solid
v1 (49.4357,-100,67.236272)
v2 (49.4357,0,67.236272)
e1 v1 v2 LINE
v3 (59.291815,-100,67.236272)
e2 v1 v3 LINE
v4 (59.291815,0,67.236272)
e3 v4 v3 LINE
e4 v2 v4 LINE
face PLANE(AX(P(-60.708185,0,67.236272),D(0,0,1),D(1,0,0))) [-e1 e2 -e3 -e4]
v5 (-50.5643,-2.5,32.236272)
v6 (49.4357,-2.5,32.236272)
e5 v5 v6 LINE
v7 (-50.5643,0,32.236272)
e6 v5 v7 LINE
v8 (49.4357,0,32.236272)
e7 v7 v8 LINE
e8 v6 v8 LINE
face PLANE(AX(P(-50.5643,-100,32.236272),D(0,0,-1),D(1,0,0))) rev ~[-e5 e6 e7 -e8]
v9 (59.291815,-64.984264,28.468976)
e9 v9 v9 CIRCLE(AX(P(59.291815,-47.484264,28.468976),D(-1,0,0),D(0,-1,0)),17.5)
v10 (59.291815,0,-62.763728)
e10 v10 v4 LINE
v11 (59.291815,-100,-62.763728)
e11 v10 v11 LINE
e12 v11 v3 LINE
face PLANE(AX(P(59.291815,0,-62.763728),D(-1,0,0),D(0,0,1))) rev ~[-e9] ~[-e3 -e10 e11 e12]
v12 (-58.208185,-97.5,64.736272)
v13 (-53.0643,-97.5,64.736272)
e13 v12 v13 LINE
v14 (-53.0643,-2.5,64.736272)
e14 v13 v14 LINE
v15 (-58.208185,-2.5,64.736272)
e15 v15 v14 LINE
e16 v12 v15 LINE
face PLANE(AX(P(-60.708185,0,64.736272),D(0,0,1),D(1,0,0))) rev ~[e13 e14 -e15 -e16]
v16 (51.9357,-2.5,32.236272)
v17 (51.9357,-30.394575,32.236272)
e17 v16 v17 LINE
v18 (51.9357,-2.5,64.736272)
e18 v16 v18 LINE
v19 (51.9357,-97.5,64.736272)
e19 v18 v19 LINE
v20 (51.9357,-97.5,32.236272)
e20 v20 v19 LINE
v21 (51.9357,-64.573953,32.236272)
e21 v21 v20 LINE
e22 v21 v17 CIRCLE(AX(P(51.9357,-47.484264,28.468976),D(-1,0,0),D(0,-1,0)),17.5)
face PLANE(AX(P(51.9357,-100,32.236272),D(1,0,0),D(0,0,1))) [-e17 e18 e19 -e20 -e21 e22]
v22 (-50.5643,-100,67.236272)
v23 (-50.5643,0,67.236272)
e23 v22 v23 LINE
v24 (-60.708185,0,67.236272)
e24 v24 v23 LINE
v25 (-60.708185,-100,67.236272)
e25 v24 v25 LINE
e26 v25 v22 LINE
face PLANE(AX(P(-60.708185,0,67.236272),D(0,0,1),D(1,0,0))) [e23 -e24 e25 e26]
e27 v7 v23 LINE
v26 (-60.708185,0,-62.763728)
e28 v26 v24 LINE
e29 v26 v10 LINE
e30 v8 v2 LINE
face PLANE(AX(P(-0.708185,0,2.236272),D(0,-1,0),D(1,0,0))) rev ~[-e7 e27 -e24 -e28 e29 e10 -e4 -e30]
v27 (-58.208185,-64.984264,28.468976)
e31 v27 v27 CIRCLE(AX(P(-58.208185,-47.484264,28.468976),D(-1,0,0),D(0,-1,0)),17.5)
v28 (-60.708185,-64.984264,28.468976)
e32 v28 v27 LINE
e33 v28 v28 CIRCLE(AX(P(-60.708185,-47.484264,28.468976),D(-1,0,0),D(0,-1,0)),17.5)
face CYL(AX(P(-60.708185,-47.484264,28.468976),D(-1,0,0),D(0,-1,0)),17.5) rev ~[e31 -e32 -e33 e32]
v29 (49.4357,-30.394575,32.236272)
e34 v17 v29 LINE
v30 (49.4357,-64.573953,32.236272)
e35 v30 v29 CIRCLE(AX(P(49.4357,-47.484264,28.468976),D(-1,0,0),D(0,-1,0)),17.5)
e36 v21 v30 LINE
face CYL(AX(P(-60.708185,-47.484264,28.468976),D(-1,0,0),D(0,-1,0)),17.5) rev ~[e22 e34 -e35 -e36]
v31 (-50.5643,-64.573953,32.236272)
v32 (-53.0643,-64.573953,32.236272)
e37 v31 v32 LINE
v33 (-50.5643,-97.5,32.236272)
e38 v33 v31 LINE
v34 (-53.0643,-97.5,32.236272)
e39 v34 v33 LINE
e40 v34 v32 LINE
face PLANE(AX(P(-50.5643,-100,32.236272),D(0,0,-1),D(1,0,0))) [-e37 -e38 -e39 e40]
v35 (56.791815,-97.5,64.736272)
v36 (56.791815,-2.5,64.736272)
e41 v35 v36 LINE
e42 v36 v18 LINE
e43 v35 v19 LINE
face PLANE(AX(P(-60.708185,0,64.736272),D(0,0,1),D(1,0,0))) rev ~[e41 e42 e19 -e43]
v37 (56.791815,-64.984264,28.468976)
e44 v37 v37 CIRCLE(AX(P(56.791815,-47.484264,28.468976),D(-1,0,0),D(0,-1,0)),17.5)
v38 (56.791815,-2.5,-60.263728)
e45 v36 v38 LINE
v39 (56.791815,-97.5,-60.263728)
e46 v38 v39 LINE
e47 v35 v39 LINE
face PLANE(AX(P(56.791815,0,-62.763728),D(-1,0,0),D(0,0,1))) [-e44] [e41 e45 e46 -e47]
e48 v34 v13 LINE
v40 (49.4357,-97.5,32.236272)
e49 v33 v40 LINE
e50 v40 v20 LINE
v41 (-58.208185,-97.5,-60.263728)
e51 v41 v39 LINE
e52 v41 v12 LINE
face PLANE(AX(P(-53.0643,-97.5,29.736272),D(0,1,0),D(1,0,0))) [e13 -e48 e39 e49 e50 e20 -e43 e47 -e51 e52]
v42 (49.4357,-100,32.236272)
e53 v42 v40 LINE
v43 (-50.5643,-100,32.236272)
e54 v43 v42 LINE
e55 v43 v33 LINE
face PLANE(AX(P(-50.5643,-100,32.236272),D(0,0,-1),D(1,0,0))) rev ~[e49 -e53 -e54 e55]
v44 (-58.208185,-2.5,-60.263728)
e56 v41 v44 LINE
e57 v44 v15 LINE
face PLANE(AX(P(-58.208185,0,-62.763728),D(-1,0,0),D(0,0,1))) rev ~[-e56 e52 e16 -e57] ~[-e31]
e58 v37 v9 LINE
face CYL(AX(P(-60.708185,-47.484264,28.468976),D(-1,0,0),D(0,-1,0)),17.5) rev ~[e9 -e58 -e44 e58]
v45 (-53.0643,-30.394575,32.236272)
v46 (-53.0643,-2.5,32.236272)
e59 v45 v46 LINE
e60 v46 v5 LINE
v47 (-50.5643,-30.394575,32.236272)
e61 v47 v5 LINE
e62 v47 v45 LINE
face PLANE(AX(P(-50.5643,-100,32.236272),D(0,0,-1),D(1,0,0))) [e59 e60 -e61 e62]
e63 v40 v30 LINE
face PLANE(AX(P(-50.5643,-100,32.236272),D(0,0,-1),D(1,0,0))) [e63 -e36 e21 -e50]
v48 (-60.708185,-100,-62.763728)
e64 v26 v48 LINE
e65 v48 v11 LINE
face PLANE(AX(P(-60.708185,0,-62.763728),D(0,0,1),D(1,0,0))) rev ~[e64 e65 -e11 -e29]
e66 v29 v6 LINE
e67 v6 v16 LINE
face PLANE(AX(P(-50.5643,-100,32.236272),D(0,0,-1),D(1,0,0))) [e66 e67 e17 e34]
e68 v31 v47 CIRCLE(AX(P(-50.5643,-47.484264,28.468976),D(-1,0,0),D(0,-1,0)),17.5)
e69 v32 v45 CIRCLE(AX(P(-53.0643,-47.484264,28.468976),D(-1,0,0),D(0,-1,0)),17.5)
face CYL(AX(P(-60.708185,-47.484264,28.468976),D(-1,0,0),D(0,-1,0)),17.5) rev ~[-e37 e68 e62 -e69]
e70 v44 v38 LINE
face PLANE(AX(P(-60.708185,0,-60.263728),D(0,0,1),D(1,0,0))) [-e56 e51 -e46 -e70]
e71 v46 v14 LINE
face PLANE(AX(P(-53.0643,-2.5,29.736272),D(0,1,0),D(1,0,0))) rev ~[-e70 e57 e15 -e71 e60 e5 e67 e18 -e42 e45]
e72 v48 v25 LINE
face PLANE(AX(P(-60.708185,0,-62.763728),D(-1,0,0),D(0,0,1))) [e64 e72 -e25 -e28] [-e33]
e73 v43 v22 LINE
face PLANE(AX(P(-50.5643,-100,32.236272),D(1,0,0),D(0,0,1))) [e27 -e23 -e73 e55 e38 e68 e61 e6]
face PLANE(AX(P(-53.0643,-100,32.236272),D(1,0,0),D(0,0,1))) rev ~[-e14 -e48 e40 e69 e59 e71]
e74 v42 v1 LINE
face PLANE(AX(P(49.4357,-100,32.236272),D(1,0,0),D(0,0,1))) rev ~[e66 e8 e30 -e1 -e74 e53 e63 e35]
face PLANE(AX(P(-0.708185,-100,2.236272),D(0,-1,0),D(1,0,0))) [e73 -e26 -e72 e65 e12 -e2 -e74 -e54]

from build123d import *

# Parameters (mm, degrees)
F0_W     = 120
F0_H     = 130
F1_DEPTH = 100
F2_W     = 100
F2_H     = 35
F3_DEPTH = 125
F4_T     = -2.5
F5_R     = 17.5
F6_DEPTH = 5005


# Not quite as in the source:
# - a shell that OpenCascade refuses in one call is made with other operations: the cavity is built on its own and cut out


with BuildPart() as f1:
    # F0 (on Front) → F1 (new body)
    with BuildSketch(Plane.XZ):
        with Locations((-0.7081851363, 2.2362722828)):
            Rectangle(F0_W, F0_H)
    extrude(amount=F1_DEPTH)

    # F2 (on face) → F3 (cut)
    with BuildSketch(Plane.XZ.offset(100)):
        with Locations((-0.5643002689, 49.7362722828)):
            Rectangle(F2_W, F2_H)
    extrude(amount=-F3_DEPTH, mode=Mode.SUBTRACT)

    # F4: a shell. OpenCascade refuses it in one call, so the cavity is built on its own and cut out:
    # the body offset inwards by the wall thickness, plus a prism from it out through each open face.
    f4_core = offset(f1.part, amount=F4_T, kind=Kind.INTERSECTION, mode=Mode.PRIVATE)
    f4_exits = [f4_core.faces().sort_by_distance(p)[0] for p in [
        (-0.5643, -50, 29.736272),
    ]]
    add(f4_core, mode=Mode.SUBTRACT)
    extrude(f4_exits, amount=-F4_T, mode=Mode.SUBTRACT)

    # F5 (on face) → F6 (cut)
    with BuildSketch(Plane(origin=(-60.7081851363, 0, 0), x_dir=(0, -1, 0), z_dir=(-1, 0, 0))):
        with Locations((47.4842637777, 28.4689757973)):
            Circle(F5_R)
    extrude(amount=-F6_DEPTH, mode=Mode.SUBTRACT)


solid = f1.part
